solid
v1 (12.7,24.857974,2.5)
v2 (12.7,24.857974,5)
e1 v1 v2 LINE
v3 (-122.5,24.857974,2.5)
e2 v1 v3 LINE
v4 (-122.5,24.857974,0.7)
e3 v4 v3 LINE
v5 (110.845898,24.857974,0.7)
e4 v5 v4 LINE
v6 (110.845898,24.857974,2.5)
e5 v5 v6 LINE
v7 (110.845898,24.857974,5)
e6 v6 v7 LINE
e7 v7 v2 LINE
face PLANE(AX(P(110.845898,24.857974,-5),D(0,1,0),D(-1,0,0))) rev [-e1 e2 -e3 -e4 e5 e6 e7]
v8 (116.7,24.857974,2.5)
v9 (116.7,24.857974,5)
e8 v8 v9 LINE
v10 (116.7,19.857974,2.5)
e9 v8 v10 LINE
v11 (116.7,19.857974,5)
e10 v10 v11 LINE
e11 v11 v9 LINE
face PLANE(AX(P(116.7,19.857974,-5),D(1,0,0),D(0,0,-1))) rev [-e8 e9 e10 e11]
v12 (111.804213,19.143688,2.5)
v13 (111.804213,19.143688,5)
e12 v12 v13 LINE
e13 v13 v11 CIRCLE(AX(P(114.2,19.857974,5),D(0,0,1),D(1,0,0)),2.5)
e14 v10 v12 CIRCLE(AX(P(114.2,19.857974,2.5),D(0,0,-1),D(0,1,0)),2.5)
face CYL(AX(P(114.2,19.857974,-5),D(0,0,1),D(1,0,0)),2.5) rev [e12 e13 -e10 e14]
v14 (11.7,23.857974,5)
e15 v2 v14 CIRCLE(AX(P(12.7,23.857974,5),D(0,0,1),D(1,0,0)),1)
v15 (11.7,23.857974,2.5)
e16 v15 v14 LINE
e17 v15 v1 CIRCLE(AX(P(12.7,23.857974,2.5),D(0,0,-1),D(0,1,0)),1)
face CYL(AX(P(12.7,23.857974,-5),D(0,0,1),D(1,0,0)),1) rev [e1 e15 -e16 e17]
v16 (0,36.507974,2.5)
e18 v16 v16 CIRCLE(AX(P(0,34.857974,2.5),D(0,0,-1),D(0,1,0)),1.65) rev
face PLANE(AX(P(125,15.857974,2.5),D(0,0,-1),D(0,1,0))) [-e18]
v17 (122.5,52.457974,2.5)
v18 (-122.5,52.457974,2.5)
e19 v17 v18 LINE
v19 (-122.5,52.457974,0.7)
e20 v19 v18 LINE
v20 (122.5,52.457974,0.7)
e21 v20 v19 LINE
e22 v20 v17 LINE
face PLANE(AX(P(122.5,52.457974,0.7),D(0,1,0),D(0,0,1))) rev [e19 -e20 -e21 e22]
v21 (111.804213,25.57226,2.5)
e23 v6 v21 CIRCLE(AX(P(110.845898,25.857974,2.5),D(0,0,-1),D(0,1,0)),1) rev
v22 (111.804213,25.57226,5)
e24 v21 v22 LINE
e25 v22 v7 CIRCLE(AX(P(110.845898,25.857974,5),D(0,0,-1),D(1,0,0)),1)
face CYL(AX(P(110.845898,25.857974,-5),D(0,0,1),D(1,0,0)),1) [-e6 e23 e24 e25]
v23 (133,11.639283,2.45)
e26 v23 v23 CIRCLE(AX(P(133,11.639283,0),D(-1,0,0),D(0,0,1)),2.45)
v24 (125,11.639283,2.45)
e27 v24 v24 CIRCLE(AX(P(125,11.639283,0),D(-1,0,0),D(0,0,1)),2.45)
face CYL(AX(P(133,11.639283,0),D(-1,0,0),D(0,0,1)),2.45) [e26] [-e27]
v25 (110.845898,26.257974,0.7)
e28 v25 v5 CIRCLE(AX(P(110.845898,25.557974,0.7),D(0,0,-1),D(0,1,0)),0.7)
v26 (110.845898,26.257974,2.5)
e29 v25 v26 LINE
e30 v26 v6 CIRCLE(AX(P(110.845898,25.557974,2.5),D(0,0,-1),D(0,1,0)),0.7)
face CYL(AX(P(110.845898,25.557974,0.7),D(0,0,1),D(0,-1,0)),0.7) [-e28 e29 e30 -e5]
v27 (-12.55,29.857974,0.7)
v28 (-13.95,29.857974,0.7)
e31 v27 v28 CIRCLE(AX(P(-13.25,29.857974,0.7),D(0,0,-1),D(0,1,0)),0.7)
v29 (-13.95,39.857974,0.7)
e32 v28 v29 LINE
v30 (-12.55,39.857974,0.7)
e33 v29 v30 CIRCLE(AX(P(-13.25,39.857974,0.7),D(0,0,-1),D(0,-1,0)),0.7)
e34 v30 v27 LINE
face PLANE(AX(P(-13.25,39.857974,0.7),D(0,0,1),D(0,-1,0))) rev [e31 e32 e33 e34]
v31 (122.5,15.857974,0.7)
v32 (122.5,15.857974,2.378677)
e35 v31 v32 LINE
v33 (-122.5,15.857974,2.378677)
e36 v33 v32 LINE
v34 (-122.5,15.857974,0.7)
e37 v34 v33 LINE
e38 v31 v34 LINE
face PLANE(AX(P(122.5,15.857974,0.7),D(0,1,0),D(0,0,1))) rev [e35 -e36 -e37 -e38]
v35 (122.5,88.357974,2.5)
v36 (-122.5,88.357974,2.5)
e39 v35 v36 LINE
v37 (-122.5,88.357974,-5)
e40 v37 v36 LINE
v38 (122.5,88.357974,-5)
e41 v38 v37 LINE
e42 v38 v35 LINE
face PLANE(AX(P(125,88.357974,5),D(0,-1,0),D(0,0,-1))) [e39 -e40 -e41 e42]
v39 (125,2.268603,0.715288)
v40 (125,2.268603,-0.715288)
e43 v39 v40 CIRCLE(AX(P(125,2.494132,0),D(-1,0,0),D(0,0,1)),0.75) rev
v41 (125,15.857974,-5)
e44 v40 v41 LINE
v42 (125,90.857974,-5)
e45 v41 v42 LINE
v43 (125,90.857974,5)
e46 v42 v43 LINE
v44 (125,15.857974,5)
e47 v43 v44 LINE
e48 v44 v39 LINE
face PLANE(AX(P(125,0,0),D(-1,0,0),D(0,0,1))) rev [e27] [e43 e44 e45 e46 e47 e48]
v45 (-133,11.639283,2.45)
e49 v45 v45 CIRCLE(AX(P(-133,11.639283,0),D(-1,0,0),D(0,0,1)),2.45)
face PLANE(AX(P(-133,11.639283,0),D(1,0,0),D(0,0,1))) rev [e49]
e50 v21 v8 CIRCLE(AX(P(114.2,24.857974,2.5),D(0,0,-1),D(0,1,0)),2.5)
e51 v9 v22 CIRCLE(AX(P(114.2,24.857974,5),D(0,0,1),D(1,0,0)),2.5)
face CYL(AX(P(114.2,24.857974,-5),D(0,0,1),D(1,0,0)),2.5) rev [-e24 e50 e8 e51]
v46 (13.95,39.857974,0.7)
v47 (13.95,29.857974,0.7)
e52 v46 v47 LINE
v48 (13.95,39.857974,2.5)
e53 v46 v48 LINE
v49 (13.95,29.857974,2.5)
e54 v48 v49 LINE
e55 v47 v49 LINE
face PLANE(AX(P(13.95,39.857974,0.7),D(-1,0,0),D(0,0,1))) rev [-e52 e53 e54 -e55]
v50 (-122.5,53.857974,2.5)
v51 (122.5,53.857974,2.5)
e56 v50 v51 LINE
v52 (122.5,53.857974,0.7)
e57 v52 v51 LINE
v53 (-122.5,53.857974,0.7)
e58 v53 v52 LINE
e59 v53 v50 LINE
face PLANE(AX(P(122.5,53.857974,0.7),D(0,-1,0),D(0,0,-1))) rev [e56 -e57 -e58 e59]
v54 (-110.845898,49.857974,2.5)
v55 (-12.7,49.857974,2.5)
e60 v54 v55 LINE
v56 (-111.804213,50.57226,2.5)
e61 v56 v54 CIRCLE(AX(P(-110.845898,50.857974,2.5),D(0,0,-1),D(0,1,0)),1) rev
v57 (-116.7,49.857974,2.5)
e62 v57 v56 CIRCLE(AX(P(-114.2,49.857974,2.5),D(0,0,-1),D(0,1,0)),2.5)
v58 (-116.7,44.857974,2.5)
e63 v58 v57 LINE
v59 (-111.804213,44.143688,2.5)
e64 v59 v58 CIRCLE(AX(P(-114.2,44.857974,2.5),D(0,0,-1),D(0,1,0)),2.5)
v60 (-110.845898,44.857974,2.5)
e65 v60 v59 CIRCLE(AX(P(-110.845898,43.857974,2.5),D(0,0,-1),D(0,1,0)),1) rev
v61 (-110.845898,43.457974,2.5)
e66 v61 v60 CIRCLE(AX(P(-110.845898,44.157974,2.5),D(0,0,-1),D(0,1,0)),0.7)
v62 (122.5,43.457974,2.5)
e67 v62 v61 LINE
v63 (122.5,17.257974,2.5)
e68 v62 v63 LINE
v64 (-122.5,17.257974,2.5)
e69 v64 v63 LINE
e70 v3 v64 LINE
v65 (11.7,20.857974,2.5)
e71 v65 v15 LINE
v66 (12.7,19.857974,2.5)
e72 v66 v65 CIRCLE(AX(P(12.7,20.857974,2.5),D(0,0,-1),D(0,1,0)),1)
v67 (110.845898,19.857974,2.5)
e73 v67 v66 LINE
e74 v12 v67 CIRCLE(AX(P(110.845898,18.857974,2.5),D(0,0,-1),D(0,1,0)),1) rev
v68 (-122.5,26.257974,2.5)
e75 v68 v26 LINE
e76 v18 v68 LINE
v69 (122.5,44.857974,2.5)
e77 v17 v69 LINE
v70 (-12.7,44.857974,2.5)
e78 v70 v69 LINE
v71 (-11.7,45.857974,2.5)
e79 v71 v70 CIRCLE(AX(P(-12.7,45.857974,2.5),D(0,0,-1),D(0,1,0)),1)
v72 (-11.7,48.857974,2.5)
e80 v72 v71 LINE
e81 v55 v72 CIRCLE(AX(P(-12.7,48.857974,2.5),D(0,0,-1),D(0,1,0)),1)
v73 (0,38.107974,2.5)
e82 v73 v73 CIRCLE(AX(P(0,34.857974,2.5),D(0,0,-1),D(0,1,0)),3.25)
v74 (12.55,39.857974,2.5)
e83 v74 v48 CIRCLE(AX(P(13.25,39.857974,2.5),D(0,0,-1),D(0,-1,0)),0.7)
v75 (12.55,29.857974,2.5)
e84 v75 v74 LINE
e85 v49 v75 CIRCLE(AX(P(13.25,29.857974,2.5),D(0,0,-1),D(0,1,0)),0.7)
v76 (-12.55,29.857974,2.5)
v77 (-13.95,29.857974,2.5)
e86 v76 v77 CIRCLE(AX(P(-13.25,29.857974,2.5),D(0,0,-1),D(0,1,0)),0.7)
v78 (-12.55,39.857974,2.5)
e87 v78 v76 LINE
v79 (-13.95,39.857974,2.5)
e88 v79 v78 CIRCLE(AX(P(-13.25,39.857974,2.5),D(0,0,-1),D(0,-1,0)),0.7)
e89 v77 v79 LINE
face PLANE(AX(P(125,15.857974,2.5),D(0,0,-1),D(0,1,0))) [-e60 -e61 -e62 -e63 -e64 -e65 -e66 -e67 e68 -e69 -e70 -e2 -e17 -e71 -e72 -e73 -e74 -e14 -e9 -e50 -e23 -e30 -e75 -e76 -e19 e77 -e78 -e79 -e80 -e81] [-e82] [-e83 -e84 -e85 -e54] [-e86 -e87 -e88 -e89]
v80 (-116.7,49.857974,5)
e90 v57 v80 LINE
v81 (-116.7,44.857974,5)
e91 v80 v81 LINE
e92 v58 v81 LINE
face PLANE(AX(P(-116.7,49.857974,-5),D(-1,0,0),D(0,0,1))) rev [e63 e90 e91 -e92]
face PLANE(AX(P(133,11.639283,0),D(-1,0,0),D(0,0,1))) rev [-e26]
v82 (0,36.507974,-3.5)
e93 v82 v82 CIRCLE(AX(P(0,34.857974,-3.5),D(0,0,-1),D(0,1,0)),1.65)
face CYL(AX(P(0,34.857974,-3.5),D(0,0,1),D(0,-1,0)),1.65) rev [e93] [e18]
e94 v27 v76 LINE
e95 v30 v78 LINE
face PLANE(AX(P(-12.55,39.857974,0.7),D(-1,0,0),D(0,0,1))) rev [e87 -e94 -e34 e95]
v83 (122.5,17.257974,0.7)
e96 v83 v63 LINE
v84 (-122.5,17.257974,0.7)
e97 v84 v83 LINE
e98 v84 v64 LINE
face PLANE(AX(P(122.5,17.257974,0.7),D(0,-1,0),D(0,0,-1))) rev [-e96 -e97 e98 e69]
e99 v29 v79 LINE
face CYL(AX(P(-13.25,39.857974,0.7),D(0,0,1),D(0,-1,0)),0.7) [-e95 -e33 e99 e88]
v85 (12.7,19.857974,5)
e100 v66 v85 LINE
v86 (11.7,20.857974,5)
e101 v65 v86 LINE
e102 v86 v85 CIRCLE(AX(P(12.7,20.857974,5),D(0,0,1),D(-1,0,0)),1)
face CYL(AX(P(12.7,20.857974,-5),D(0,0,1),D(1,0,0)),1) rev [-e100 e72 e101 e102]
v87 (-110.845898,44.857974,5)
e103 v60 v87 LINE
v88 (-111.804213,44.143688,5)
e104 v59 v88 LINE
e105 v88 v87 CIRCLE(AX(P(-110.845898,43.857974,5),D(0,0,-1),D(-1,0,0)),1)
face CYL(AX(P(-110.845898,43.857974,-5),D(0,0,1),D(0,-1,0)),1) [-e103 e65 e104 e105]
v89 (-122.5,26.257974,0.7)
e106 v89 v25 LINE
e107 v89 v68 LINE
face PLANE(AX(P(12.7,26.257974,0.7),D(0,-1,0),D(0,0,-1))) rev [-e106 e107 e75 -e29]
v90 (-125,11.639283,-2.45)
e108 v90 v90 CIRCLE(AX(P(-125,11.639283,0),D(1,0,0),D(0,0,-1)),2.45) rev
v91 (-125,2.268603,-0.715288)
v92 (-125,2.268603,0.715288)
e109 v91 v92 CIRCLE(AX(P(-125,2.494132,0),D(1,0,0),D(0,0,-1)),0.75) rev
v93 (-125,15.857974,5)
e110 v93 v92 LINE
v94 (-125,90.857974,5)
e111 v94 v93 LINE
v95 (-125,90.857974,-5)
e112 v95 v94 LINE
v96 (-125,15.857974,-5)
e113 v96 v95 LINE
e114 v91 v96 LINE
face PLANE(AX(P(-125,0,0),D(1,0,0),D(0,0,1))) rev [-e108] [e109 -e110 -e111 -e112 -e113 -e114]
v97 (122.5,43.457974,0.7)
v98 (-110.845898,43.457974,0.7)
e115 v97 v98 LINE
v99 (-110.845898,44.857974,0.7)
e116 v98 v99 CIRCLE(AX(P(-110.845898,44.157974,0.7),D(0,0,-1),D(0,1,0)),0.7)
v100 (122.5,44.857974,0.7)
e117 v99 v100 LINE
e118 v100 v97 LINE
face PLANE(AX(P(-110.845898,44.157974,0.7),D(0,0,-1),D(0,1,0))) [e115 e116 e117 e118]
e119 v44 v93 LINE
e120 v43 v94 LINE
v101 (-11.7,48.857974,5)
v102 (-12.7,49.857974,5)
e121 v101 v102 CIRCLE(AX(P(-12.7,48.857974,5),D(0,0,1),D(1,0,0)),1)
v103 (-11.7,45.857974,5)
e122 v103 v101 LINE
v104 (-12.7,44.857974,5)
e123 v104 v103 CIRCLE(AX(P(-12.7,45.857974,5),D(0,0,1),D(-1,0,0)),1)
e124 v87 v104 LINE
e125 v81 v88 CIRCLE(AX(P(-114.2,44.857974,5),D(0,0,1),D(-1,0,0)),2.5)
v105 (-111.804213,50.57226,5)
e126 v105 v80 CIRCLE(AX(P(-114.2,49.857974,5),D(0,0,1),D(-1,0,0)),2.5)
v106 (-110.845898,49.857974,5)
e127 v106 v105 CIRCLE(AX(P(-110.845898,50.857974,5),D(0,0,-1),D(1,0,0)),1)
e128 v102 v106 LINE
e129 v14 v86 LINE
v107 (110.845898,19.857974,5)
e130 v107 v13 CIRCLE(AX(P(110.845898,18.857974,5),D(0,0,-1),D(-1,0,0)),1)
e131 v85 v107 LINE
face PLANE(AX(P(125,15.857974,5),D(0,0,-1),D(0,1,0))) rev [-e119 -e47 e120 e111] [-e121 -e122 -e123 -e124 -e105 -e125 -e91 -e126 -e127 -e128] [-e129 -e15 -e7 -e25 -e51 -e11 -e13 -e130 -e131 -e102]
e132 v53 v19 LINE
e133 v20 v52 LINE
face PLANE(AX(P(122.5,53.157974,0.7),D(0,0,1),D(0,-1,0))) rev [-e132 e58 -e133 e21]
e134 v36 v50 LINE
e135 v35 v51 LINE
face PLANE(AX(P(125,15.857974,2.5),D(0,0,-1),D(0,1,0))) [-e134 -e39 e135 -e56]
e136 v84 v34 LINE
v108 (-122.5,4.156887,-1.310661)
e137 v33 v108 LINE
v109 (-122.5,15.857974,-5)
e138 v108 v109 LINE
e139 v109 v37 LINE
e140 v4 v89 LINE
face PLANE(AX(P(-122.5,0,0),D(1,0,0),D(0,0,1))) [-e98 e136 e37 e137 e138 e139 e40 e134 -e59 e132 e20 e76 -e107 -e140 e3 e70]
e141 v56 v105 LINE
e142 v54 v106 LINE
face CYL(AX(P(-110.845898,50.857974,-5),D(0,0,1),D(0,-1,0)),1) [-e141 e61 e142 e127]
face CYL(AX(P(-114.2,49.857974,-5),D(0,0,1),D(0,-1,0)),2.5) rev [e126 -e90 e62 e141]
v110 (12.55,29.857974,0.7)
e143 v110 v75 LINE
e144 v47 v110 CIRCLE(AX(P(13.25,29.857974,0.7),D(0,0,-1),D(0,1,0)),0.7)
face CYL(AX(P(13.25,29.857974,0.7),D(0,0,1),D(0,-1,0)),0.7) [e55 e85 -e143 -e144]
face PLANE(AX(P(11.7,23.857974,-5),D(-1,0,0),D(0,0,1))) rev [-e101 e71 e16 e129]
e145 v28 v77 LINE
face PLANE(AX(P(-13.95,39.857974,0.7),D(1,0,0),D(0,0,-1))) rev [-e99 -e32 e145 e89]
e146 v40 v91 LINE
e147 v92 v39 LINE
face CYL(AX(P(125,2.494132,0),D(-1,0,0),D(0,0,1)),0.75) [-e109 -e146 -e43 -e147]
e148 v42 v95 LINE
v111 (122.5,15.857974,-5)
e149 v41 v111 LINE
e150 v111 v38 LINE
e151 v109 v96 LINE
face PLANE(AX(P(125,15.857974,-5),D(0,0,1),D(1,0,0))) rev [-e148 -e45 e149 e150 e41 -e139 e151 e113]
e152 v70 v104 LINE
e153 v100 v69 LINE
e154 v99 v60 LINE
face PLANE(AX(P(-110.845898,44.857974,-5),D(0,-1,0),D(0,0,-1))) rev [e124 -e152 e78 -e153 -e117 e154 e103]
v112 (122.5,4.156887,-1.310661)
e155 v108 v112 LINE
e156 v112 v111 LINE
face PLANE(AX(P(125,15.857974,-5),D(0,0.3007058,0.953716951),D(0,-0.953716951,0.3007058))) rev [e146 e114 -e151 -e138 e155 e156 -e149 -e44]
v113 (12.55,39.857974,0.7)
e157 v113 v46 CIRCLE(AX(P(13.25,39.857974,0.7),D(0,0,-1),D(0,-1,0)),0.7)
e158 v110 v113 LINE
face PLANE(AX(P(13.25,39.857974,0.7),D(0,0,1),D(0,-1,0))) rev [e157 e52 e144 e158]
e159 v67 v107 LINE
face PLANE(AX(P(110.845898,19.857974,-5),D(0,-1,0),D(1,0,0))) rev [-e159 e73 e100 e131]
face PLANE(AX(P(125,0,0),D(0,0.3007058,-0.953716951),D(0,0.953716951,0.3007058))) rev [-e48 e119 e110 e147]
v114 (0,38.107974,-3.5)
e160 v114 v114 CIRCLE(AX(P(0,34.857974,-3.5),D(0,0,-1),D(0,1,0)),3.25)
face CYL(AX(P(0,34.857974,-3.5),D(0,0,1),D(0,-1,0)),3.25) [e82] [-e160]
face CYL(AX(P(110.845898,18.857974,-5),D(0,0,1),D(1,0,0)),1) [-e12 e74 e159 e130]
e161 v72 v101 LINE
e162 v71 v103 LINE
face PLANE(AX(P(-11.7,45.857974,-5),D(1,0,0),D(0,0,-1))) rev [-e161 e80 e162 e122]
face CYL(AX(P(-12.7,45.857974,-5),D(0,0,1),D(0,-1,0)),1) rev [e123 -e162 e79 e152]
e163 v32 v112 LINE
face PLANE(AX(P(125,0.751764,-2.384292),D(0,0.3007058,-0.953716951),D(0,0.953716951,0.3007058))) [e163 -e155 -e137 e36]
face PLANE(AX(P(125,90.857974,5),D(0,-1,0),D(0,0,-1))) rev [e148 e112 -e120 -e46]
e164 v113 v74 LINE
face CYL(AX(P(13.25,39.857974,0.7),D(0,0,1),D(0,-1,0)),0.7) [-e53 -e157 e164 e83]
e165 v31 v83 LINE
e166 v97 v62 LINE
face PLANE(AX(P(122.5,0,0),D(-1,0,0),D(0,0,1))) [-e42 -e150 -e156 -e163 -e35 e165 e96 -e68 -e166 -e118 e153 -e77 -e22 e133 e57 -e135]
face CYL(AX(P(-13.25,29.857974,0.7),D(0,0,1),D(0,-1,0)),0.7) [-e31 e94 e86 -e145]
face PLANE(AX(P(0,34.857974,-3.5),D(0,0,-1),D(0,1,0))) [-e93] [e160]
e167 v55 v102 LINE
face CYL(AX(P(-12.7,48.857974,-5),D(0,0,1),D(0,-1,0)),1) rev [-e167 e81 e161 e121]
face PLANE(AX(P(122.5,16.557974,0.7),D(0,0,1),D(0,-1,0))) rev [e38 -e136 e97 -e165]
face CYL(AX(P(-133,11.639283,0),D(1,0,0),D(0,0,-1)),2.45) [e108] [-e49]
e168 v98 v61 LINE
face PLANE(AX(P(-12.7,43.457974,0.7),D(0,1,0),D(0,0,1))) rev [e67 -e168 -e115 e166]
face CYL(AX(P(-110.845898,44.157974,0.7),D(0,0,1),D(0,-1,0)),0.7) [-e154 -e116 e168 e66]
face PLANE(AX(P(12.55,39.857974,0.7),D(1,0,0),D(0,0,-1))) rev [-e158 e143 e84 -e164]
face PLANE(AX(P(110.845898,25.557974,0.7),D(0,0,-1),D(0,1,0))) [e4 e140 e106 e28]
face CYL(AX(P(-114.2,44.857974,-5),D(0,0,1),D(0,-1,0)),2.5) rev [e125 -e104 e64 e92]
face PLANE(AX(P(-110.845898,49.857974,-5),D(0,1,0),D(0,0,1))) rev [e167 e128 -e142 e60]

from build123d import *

# Parameters (mm, degrees)
BOSS_EXTRU_1_DEPTH           = 125
ESQUISSE2_R                  = 2.45
BOSS_EXTRU_2_DEPTH           = 8
CONG_1_R                     = 0.75
COQUE1_START                 = -122.5
COQUE1_DEPTH                 = 245
ENL_V_MAT_EXTRU_1_DEPTH      = 162.382066666
ESQUISSE4_R                  = 3.25
ESQUISSE4_R_2                = 1.65
BOSS_EXTRU_3_DEPTH           = 6
R_P_TITION_CIRCULAIRE1_COUNT = 2
BOSS_EXTRU_4_DEPTH           = 1.8


# Read off the part's stored shape, not the designer's step: Coque1
with BuildPart() as part:
    # Esquisse1 → Boss.-Extru.1 (new body)
    with BuildSketch(Plane(origin=(0, 0, 0), x_dir=(0, 0, -1), z_dir=(1, 0, 0))):
        Polygon((5, 15.857974012), (0, 0), (-5, 15.857974012), (-5, 90.857974012), (5, 90.857974012), align=None)
    boss_extru_1 = extrude(amount=BOSS_EXTRU_1_DEPTH)

    # Esquisse2 → Boss.-Extru.2 (add)
    with BuildSketch(Plane.ZY.offset(-125)):
        with Locations((0, 11.639283332)):
            Circle(ESQUISSE2_R)
    boss_extru_2 = extrude(amount=-BOSS_EXTRU_2_DEPTH)

    # Symétrie1: Boss.-Extru.1, Boss.-Extru.2 across plane
    add(boss_extru_1.mirror(Plane(origin=(0, 0, 0), x_dir=(0, 0, 1), z_dir=(1, 0, 0))))
    add(boss_extru_2.mirror(Plane(origin=(0, 0, 0), x_dir=(0, 0, 1), z_dir=(1, 0, 0))))

    # Congé1
    cong_1_edges = [part.edges().sort_by_distance(p)[0] for p in [
        (0, 0, 0),
    ]]
    fillet(cong_1_edges, radius=CONG_1_R)

    # Coque1 outline → Coque1 (cut)
    with BuildSketch(Plane.YZ.offset(COQUE1_START)):
        Polygon((16.242760814, 2.5), (4.156886904, -1.310661406), (15.857974012, -5), (88.357974012, -5), (88.357974012, 2.5), align=None)
    extrude(amount=COQUE1_DEPTH, mode=Mode.SUBTRACT)

    # Esquisse3 → Enlèv. mat.-Extru.1 (cut, through all)
    with BuildSketch(Plane.XY.offset(5)):
        with BuildLine():
            Line((116.7, 19.857974012), (116.7, 24.857974012))
            ThreePointArc((116.7, 24.857974012), (114.560923955, 27.331783604), (111.804212881, 25.572259726))
            ThreePointArc((111.804212881, 25.572259726), (111.443512338, 25.056190286), (110.845898034, 24.857974012))
            Line((110.845898034, 24.857974012), (12.7, 24.857974012))
            ThreePointArc((12.7, 24.857974012), (11.992893219, 24.565080793), (11.7, 23.857974012))
            Line((11.7, 23.857974012), (11.7, 20.857974012))
            ThreePointArc((11.7, 20.857974012), (11.992893219, 20.150867231), (12.7, 19.857974012))
            Line((12.7, 19.857974012), (110.845898034, 19.857974012))
            ThreePointArc((110.845898034, 19.857974012), (111.443512338, 19.659757738), (111.804212881, 19.143688298))
            ThreePointArc((111.804212881, 19.143688298), (114.560923955, 17.38416442), (116.7, 19.857974012))
        make_face()
    enl_v_mat_extru_1 = extrude(amount=-ENL_V_MAT_EXTRU_1_DEPTH, mode=Mode.SUBTRACT)

    # Esquisse4 → Boss.-Extru.3 (add)
    with BuildSketch(Plane(origin=(0, 0, 2.5), x_dir=(-1, 0, 0), z_dir=(0, 0, -1))):
        with Locations(Location((0, 34.857974012, 0), (0, 0, 90))):
            Circle(ESQUISSE4_R)
        with Locations(Location((0, 34.857974012, 0), (0, 0, 90))):
            Circle(ESQUISSE4_R_2, mode=Mode.SUBTRACT)
    extrude(amount=BOSS_EXTRU_3_DEPTH)

    # Répétition circulaire1: Enlèv. mat.-Extru.1 ×2 about axis
    r_p_tition_circulaire1_axis = Axis((0, 34.857974012, 0), (0, 0, 1))
    for i in range(1, R_P_TITION_CIRCULAIRE1_COUNT):
        add(enl_v_mat_extru_1.rotate(r_p_tition_circulaire1_axis, i * 360 / R_P_TITION_CIRCULAIRE1_COUNT), mode=Mode.SUBTRACT)

    # Esquisse5 → Boss.-Extru.4 (add)
    with BuildSketch(Plane(origin=(0, 0, 2.5), x_dir=(-1, 0, 0), z_dir=(0, 0, -1))):
        with BuildLine():
            Line((-13.95, 39.857974012), (-13.95, 29.857974012))
            ThreePointArc((-13.95, 29.857974012), (-13.25, 29.157974012), (-12.55, 29.857974012))
            Line((-12.55, 29.857974012), (-12.55, 39.857974012))
            ThreePointArc((-12.55, 39.857974012), (-13.25, 40.557974012), (-13.95, 39.857974012))
        make_face()
        with BuildLine():
            Line((12.55, 39.857974012), (12.55, 29.857974012))
            ThreePointArc((12.55, 29.857974012), (13.25, 29.157974012), (13.95, 29.857974012))
            Line((13.95, 29.857974012), (13.95, 39.857974012))
            ThreePointArc((13.95, 39.857974012), (13.25, 40.557974012), (12.55, 39.857974012))
        make_face()
        with BuildLine():
            Line((-12.7, 26.257974012), (122.5, 26.257974012))
            ThreePointArc((122.5, 26.257974012), (123.2, 25.557974012), (122.5, 24.857974012))
            Line((122.5, 24.857974012), (-12.7, 24.857974012))
            Line((-12.7, 24.857974012), (-110.845898034, 24.857974012))
            ThreePointArc((-110.845898034, 24.857974012), (-111.545898034, 25.557974012), (-110.845898034, 26.257974012))
            Line((-110.845898034, 26.257974012), (-12.7, 26.257974012))
        make_face()
        with BuildLine():
            Line((-122.5, 15.857974012), (122.5, 15.857974012))
            ThreePointArc((122.5, 15.857974012), (123.2, 16.557974012), (122.5, 17.257974012))
            Line((122.5, 17.257974012), (-122.5, 17.257974012))
            ThreePointArc((-122.5, 17.257974012), (-123.2, 16.557974012), (-122.5, 15.857974012))
        make_face()
        with BuildLine():
            Line((12.7, 43.457974012), (-122.5, 43.457974012))
            ThreePointArc((-122.5, 43.457974012), (-123.2, 44.157974012), (-122.5, 44.857974012))
            Line((-122.5, 44.857974012), (12.7, 44.857974012))
            Line((12.7, 44.857974012), (110.845898034, 44.857974012))
            ThreePointArc((110.845898034, 44.857974012), (111.545898034, 44.157974012), (110.845898034, 43.457974012))
            Line((110.845898034, 43.457974012), (12.7, 43.457974012))
        make_face()
        with BuildLine():
            Line((-122.5, 52.457974012), (122.5, 52.457974012))
            ThreePointArc((122.5, 52.457974012), (123.2, 53.157974012), (122.5, 53.857974012))
            Line((122.5, 53.857974012), (-122.5, 53.857974012))
            ThreePointArc((-122.5, 53.857974012), (-123.2, 53.157974012), (-122.5, 52.457974012))
        make_face()
    extrude(amount=BOSS_EXTRU_4_DEPTH)


solid = part.part
